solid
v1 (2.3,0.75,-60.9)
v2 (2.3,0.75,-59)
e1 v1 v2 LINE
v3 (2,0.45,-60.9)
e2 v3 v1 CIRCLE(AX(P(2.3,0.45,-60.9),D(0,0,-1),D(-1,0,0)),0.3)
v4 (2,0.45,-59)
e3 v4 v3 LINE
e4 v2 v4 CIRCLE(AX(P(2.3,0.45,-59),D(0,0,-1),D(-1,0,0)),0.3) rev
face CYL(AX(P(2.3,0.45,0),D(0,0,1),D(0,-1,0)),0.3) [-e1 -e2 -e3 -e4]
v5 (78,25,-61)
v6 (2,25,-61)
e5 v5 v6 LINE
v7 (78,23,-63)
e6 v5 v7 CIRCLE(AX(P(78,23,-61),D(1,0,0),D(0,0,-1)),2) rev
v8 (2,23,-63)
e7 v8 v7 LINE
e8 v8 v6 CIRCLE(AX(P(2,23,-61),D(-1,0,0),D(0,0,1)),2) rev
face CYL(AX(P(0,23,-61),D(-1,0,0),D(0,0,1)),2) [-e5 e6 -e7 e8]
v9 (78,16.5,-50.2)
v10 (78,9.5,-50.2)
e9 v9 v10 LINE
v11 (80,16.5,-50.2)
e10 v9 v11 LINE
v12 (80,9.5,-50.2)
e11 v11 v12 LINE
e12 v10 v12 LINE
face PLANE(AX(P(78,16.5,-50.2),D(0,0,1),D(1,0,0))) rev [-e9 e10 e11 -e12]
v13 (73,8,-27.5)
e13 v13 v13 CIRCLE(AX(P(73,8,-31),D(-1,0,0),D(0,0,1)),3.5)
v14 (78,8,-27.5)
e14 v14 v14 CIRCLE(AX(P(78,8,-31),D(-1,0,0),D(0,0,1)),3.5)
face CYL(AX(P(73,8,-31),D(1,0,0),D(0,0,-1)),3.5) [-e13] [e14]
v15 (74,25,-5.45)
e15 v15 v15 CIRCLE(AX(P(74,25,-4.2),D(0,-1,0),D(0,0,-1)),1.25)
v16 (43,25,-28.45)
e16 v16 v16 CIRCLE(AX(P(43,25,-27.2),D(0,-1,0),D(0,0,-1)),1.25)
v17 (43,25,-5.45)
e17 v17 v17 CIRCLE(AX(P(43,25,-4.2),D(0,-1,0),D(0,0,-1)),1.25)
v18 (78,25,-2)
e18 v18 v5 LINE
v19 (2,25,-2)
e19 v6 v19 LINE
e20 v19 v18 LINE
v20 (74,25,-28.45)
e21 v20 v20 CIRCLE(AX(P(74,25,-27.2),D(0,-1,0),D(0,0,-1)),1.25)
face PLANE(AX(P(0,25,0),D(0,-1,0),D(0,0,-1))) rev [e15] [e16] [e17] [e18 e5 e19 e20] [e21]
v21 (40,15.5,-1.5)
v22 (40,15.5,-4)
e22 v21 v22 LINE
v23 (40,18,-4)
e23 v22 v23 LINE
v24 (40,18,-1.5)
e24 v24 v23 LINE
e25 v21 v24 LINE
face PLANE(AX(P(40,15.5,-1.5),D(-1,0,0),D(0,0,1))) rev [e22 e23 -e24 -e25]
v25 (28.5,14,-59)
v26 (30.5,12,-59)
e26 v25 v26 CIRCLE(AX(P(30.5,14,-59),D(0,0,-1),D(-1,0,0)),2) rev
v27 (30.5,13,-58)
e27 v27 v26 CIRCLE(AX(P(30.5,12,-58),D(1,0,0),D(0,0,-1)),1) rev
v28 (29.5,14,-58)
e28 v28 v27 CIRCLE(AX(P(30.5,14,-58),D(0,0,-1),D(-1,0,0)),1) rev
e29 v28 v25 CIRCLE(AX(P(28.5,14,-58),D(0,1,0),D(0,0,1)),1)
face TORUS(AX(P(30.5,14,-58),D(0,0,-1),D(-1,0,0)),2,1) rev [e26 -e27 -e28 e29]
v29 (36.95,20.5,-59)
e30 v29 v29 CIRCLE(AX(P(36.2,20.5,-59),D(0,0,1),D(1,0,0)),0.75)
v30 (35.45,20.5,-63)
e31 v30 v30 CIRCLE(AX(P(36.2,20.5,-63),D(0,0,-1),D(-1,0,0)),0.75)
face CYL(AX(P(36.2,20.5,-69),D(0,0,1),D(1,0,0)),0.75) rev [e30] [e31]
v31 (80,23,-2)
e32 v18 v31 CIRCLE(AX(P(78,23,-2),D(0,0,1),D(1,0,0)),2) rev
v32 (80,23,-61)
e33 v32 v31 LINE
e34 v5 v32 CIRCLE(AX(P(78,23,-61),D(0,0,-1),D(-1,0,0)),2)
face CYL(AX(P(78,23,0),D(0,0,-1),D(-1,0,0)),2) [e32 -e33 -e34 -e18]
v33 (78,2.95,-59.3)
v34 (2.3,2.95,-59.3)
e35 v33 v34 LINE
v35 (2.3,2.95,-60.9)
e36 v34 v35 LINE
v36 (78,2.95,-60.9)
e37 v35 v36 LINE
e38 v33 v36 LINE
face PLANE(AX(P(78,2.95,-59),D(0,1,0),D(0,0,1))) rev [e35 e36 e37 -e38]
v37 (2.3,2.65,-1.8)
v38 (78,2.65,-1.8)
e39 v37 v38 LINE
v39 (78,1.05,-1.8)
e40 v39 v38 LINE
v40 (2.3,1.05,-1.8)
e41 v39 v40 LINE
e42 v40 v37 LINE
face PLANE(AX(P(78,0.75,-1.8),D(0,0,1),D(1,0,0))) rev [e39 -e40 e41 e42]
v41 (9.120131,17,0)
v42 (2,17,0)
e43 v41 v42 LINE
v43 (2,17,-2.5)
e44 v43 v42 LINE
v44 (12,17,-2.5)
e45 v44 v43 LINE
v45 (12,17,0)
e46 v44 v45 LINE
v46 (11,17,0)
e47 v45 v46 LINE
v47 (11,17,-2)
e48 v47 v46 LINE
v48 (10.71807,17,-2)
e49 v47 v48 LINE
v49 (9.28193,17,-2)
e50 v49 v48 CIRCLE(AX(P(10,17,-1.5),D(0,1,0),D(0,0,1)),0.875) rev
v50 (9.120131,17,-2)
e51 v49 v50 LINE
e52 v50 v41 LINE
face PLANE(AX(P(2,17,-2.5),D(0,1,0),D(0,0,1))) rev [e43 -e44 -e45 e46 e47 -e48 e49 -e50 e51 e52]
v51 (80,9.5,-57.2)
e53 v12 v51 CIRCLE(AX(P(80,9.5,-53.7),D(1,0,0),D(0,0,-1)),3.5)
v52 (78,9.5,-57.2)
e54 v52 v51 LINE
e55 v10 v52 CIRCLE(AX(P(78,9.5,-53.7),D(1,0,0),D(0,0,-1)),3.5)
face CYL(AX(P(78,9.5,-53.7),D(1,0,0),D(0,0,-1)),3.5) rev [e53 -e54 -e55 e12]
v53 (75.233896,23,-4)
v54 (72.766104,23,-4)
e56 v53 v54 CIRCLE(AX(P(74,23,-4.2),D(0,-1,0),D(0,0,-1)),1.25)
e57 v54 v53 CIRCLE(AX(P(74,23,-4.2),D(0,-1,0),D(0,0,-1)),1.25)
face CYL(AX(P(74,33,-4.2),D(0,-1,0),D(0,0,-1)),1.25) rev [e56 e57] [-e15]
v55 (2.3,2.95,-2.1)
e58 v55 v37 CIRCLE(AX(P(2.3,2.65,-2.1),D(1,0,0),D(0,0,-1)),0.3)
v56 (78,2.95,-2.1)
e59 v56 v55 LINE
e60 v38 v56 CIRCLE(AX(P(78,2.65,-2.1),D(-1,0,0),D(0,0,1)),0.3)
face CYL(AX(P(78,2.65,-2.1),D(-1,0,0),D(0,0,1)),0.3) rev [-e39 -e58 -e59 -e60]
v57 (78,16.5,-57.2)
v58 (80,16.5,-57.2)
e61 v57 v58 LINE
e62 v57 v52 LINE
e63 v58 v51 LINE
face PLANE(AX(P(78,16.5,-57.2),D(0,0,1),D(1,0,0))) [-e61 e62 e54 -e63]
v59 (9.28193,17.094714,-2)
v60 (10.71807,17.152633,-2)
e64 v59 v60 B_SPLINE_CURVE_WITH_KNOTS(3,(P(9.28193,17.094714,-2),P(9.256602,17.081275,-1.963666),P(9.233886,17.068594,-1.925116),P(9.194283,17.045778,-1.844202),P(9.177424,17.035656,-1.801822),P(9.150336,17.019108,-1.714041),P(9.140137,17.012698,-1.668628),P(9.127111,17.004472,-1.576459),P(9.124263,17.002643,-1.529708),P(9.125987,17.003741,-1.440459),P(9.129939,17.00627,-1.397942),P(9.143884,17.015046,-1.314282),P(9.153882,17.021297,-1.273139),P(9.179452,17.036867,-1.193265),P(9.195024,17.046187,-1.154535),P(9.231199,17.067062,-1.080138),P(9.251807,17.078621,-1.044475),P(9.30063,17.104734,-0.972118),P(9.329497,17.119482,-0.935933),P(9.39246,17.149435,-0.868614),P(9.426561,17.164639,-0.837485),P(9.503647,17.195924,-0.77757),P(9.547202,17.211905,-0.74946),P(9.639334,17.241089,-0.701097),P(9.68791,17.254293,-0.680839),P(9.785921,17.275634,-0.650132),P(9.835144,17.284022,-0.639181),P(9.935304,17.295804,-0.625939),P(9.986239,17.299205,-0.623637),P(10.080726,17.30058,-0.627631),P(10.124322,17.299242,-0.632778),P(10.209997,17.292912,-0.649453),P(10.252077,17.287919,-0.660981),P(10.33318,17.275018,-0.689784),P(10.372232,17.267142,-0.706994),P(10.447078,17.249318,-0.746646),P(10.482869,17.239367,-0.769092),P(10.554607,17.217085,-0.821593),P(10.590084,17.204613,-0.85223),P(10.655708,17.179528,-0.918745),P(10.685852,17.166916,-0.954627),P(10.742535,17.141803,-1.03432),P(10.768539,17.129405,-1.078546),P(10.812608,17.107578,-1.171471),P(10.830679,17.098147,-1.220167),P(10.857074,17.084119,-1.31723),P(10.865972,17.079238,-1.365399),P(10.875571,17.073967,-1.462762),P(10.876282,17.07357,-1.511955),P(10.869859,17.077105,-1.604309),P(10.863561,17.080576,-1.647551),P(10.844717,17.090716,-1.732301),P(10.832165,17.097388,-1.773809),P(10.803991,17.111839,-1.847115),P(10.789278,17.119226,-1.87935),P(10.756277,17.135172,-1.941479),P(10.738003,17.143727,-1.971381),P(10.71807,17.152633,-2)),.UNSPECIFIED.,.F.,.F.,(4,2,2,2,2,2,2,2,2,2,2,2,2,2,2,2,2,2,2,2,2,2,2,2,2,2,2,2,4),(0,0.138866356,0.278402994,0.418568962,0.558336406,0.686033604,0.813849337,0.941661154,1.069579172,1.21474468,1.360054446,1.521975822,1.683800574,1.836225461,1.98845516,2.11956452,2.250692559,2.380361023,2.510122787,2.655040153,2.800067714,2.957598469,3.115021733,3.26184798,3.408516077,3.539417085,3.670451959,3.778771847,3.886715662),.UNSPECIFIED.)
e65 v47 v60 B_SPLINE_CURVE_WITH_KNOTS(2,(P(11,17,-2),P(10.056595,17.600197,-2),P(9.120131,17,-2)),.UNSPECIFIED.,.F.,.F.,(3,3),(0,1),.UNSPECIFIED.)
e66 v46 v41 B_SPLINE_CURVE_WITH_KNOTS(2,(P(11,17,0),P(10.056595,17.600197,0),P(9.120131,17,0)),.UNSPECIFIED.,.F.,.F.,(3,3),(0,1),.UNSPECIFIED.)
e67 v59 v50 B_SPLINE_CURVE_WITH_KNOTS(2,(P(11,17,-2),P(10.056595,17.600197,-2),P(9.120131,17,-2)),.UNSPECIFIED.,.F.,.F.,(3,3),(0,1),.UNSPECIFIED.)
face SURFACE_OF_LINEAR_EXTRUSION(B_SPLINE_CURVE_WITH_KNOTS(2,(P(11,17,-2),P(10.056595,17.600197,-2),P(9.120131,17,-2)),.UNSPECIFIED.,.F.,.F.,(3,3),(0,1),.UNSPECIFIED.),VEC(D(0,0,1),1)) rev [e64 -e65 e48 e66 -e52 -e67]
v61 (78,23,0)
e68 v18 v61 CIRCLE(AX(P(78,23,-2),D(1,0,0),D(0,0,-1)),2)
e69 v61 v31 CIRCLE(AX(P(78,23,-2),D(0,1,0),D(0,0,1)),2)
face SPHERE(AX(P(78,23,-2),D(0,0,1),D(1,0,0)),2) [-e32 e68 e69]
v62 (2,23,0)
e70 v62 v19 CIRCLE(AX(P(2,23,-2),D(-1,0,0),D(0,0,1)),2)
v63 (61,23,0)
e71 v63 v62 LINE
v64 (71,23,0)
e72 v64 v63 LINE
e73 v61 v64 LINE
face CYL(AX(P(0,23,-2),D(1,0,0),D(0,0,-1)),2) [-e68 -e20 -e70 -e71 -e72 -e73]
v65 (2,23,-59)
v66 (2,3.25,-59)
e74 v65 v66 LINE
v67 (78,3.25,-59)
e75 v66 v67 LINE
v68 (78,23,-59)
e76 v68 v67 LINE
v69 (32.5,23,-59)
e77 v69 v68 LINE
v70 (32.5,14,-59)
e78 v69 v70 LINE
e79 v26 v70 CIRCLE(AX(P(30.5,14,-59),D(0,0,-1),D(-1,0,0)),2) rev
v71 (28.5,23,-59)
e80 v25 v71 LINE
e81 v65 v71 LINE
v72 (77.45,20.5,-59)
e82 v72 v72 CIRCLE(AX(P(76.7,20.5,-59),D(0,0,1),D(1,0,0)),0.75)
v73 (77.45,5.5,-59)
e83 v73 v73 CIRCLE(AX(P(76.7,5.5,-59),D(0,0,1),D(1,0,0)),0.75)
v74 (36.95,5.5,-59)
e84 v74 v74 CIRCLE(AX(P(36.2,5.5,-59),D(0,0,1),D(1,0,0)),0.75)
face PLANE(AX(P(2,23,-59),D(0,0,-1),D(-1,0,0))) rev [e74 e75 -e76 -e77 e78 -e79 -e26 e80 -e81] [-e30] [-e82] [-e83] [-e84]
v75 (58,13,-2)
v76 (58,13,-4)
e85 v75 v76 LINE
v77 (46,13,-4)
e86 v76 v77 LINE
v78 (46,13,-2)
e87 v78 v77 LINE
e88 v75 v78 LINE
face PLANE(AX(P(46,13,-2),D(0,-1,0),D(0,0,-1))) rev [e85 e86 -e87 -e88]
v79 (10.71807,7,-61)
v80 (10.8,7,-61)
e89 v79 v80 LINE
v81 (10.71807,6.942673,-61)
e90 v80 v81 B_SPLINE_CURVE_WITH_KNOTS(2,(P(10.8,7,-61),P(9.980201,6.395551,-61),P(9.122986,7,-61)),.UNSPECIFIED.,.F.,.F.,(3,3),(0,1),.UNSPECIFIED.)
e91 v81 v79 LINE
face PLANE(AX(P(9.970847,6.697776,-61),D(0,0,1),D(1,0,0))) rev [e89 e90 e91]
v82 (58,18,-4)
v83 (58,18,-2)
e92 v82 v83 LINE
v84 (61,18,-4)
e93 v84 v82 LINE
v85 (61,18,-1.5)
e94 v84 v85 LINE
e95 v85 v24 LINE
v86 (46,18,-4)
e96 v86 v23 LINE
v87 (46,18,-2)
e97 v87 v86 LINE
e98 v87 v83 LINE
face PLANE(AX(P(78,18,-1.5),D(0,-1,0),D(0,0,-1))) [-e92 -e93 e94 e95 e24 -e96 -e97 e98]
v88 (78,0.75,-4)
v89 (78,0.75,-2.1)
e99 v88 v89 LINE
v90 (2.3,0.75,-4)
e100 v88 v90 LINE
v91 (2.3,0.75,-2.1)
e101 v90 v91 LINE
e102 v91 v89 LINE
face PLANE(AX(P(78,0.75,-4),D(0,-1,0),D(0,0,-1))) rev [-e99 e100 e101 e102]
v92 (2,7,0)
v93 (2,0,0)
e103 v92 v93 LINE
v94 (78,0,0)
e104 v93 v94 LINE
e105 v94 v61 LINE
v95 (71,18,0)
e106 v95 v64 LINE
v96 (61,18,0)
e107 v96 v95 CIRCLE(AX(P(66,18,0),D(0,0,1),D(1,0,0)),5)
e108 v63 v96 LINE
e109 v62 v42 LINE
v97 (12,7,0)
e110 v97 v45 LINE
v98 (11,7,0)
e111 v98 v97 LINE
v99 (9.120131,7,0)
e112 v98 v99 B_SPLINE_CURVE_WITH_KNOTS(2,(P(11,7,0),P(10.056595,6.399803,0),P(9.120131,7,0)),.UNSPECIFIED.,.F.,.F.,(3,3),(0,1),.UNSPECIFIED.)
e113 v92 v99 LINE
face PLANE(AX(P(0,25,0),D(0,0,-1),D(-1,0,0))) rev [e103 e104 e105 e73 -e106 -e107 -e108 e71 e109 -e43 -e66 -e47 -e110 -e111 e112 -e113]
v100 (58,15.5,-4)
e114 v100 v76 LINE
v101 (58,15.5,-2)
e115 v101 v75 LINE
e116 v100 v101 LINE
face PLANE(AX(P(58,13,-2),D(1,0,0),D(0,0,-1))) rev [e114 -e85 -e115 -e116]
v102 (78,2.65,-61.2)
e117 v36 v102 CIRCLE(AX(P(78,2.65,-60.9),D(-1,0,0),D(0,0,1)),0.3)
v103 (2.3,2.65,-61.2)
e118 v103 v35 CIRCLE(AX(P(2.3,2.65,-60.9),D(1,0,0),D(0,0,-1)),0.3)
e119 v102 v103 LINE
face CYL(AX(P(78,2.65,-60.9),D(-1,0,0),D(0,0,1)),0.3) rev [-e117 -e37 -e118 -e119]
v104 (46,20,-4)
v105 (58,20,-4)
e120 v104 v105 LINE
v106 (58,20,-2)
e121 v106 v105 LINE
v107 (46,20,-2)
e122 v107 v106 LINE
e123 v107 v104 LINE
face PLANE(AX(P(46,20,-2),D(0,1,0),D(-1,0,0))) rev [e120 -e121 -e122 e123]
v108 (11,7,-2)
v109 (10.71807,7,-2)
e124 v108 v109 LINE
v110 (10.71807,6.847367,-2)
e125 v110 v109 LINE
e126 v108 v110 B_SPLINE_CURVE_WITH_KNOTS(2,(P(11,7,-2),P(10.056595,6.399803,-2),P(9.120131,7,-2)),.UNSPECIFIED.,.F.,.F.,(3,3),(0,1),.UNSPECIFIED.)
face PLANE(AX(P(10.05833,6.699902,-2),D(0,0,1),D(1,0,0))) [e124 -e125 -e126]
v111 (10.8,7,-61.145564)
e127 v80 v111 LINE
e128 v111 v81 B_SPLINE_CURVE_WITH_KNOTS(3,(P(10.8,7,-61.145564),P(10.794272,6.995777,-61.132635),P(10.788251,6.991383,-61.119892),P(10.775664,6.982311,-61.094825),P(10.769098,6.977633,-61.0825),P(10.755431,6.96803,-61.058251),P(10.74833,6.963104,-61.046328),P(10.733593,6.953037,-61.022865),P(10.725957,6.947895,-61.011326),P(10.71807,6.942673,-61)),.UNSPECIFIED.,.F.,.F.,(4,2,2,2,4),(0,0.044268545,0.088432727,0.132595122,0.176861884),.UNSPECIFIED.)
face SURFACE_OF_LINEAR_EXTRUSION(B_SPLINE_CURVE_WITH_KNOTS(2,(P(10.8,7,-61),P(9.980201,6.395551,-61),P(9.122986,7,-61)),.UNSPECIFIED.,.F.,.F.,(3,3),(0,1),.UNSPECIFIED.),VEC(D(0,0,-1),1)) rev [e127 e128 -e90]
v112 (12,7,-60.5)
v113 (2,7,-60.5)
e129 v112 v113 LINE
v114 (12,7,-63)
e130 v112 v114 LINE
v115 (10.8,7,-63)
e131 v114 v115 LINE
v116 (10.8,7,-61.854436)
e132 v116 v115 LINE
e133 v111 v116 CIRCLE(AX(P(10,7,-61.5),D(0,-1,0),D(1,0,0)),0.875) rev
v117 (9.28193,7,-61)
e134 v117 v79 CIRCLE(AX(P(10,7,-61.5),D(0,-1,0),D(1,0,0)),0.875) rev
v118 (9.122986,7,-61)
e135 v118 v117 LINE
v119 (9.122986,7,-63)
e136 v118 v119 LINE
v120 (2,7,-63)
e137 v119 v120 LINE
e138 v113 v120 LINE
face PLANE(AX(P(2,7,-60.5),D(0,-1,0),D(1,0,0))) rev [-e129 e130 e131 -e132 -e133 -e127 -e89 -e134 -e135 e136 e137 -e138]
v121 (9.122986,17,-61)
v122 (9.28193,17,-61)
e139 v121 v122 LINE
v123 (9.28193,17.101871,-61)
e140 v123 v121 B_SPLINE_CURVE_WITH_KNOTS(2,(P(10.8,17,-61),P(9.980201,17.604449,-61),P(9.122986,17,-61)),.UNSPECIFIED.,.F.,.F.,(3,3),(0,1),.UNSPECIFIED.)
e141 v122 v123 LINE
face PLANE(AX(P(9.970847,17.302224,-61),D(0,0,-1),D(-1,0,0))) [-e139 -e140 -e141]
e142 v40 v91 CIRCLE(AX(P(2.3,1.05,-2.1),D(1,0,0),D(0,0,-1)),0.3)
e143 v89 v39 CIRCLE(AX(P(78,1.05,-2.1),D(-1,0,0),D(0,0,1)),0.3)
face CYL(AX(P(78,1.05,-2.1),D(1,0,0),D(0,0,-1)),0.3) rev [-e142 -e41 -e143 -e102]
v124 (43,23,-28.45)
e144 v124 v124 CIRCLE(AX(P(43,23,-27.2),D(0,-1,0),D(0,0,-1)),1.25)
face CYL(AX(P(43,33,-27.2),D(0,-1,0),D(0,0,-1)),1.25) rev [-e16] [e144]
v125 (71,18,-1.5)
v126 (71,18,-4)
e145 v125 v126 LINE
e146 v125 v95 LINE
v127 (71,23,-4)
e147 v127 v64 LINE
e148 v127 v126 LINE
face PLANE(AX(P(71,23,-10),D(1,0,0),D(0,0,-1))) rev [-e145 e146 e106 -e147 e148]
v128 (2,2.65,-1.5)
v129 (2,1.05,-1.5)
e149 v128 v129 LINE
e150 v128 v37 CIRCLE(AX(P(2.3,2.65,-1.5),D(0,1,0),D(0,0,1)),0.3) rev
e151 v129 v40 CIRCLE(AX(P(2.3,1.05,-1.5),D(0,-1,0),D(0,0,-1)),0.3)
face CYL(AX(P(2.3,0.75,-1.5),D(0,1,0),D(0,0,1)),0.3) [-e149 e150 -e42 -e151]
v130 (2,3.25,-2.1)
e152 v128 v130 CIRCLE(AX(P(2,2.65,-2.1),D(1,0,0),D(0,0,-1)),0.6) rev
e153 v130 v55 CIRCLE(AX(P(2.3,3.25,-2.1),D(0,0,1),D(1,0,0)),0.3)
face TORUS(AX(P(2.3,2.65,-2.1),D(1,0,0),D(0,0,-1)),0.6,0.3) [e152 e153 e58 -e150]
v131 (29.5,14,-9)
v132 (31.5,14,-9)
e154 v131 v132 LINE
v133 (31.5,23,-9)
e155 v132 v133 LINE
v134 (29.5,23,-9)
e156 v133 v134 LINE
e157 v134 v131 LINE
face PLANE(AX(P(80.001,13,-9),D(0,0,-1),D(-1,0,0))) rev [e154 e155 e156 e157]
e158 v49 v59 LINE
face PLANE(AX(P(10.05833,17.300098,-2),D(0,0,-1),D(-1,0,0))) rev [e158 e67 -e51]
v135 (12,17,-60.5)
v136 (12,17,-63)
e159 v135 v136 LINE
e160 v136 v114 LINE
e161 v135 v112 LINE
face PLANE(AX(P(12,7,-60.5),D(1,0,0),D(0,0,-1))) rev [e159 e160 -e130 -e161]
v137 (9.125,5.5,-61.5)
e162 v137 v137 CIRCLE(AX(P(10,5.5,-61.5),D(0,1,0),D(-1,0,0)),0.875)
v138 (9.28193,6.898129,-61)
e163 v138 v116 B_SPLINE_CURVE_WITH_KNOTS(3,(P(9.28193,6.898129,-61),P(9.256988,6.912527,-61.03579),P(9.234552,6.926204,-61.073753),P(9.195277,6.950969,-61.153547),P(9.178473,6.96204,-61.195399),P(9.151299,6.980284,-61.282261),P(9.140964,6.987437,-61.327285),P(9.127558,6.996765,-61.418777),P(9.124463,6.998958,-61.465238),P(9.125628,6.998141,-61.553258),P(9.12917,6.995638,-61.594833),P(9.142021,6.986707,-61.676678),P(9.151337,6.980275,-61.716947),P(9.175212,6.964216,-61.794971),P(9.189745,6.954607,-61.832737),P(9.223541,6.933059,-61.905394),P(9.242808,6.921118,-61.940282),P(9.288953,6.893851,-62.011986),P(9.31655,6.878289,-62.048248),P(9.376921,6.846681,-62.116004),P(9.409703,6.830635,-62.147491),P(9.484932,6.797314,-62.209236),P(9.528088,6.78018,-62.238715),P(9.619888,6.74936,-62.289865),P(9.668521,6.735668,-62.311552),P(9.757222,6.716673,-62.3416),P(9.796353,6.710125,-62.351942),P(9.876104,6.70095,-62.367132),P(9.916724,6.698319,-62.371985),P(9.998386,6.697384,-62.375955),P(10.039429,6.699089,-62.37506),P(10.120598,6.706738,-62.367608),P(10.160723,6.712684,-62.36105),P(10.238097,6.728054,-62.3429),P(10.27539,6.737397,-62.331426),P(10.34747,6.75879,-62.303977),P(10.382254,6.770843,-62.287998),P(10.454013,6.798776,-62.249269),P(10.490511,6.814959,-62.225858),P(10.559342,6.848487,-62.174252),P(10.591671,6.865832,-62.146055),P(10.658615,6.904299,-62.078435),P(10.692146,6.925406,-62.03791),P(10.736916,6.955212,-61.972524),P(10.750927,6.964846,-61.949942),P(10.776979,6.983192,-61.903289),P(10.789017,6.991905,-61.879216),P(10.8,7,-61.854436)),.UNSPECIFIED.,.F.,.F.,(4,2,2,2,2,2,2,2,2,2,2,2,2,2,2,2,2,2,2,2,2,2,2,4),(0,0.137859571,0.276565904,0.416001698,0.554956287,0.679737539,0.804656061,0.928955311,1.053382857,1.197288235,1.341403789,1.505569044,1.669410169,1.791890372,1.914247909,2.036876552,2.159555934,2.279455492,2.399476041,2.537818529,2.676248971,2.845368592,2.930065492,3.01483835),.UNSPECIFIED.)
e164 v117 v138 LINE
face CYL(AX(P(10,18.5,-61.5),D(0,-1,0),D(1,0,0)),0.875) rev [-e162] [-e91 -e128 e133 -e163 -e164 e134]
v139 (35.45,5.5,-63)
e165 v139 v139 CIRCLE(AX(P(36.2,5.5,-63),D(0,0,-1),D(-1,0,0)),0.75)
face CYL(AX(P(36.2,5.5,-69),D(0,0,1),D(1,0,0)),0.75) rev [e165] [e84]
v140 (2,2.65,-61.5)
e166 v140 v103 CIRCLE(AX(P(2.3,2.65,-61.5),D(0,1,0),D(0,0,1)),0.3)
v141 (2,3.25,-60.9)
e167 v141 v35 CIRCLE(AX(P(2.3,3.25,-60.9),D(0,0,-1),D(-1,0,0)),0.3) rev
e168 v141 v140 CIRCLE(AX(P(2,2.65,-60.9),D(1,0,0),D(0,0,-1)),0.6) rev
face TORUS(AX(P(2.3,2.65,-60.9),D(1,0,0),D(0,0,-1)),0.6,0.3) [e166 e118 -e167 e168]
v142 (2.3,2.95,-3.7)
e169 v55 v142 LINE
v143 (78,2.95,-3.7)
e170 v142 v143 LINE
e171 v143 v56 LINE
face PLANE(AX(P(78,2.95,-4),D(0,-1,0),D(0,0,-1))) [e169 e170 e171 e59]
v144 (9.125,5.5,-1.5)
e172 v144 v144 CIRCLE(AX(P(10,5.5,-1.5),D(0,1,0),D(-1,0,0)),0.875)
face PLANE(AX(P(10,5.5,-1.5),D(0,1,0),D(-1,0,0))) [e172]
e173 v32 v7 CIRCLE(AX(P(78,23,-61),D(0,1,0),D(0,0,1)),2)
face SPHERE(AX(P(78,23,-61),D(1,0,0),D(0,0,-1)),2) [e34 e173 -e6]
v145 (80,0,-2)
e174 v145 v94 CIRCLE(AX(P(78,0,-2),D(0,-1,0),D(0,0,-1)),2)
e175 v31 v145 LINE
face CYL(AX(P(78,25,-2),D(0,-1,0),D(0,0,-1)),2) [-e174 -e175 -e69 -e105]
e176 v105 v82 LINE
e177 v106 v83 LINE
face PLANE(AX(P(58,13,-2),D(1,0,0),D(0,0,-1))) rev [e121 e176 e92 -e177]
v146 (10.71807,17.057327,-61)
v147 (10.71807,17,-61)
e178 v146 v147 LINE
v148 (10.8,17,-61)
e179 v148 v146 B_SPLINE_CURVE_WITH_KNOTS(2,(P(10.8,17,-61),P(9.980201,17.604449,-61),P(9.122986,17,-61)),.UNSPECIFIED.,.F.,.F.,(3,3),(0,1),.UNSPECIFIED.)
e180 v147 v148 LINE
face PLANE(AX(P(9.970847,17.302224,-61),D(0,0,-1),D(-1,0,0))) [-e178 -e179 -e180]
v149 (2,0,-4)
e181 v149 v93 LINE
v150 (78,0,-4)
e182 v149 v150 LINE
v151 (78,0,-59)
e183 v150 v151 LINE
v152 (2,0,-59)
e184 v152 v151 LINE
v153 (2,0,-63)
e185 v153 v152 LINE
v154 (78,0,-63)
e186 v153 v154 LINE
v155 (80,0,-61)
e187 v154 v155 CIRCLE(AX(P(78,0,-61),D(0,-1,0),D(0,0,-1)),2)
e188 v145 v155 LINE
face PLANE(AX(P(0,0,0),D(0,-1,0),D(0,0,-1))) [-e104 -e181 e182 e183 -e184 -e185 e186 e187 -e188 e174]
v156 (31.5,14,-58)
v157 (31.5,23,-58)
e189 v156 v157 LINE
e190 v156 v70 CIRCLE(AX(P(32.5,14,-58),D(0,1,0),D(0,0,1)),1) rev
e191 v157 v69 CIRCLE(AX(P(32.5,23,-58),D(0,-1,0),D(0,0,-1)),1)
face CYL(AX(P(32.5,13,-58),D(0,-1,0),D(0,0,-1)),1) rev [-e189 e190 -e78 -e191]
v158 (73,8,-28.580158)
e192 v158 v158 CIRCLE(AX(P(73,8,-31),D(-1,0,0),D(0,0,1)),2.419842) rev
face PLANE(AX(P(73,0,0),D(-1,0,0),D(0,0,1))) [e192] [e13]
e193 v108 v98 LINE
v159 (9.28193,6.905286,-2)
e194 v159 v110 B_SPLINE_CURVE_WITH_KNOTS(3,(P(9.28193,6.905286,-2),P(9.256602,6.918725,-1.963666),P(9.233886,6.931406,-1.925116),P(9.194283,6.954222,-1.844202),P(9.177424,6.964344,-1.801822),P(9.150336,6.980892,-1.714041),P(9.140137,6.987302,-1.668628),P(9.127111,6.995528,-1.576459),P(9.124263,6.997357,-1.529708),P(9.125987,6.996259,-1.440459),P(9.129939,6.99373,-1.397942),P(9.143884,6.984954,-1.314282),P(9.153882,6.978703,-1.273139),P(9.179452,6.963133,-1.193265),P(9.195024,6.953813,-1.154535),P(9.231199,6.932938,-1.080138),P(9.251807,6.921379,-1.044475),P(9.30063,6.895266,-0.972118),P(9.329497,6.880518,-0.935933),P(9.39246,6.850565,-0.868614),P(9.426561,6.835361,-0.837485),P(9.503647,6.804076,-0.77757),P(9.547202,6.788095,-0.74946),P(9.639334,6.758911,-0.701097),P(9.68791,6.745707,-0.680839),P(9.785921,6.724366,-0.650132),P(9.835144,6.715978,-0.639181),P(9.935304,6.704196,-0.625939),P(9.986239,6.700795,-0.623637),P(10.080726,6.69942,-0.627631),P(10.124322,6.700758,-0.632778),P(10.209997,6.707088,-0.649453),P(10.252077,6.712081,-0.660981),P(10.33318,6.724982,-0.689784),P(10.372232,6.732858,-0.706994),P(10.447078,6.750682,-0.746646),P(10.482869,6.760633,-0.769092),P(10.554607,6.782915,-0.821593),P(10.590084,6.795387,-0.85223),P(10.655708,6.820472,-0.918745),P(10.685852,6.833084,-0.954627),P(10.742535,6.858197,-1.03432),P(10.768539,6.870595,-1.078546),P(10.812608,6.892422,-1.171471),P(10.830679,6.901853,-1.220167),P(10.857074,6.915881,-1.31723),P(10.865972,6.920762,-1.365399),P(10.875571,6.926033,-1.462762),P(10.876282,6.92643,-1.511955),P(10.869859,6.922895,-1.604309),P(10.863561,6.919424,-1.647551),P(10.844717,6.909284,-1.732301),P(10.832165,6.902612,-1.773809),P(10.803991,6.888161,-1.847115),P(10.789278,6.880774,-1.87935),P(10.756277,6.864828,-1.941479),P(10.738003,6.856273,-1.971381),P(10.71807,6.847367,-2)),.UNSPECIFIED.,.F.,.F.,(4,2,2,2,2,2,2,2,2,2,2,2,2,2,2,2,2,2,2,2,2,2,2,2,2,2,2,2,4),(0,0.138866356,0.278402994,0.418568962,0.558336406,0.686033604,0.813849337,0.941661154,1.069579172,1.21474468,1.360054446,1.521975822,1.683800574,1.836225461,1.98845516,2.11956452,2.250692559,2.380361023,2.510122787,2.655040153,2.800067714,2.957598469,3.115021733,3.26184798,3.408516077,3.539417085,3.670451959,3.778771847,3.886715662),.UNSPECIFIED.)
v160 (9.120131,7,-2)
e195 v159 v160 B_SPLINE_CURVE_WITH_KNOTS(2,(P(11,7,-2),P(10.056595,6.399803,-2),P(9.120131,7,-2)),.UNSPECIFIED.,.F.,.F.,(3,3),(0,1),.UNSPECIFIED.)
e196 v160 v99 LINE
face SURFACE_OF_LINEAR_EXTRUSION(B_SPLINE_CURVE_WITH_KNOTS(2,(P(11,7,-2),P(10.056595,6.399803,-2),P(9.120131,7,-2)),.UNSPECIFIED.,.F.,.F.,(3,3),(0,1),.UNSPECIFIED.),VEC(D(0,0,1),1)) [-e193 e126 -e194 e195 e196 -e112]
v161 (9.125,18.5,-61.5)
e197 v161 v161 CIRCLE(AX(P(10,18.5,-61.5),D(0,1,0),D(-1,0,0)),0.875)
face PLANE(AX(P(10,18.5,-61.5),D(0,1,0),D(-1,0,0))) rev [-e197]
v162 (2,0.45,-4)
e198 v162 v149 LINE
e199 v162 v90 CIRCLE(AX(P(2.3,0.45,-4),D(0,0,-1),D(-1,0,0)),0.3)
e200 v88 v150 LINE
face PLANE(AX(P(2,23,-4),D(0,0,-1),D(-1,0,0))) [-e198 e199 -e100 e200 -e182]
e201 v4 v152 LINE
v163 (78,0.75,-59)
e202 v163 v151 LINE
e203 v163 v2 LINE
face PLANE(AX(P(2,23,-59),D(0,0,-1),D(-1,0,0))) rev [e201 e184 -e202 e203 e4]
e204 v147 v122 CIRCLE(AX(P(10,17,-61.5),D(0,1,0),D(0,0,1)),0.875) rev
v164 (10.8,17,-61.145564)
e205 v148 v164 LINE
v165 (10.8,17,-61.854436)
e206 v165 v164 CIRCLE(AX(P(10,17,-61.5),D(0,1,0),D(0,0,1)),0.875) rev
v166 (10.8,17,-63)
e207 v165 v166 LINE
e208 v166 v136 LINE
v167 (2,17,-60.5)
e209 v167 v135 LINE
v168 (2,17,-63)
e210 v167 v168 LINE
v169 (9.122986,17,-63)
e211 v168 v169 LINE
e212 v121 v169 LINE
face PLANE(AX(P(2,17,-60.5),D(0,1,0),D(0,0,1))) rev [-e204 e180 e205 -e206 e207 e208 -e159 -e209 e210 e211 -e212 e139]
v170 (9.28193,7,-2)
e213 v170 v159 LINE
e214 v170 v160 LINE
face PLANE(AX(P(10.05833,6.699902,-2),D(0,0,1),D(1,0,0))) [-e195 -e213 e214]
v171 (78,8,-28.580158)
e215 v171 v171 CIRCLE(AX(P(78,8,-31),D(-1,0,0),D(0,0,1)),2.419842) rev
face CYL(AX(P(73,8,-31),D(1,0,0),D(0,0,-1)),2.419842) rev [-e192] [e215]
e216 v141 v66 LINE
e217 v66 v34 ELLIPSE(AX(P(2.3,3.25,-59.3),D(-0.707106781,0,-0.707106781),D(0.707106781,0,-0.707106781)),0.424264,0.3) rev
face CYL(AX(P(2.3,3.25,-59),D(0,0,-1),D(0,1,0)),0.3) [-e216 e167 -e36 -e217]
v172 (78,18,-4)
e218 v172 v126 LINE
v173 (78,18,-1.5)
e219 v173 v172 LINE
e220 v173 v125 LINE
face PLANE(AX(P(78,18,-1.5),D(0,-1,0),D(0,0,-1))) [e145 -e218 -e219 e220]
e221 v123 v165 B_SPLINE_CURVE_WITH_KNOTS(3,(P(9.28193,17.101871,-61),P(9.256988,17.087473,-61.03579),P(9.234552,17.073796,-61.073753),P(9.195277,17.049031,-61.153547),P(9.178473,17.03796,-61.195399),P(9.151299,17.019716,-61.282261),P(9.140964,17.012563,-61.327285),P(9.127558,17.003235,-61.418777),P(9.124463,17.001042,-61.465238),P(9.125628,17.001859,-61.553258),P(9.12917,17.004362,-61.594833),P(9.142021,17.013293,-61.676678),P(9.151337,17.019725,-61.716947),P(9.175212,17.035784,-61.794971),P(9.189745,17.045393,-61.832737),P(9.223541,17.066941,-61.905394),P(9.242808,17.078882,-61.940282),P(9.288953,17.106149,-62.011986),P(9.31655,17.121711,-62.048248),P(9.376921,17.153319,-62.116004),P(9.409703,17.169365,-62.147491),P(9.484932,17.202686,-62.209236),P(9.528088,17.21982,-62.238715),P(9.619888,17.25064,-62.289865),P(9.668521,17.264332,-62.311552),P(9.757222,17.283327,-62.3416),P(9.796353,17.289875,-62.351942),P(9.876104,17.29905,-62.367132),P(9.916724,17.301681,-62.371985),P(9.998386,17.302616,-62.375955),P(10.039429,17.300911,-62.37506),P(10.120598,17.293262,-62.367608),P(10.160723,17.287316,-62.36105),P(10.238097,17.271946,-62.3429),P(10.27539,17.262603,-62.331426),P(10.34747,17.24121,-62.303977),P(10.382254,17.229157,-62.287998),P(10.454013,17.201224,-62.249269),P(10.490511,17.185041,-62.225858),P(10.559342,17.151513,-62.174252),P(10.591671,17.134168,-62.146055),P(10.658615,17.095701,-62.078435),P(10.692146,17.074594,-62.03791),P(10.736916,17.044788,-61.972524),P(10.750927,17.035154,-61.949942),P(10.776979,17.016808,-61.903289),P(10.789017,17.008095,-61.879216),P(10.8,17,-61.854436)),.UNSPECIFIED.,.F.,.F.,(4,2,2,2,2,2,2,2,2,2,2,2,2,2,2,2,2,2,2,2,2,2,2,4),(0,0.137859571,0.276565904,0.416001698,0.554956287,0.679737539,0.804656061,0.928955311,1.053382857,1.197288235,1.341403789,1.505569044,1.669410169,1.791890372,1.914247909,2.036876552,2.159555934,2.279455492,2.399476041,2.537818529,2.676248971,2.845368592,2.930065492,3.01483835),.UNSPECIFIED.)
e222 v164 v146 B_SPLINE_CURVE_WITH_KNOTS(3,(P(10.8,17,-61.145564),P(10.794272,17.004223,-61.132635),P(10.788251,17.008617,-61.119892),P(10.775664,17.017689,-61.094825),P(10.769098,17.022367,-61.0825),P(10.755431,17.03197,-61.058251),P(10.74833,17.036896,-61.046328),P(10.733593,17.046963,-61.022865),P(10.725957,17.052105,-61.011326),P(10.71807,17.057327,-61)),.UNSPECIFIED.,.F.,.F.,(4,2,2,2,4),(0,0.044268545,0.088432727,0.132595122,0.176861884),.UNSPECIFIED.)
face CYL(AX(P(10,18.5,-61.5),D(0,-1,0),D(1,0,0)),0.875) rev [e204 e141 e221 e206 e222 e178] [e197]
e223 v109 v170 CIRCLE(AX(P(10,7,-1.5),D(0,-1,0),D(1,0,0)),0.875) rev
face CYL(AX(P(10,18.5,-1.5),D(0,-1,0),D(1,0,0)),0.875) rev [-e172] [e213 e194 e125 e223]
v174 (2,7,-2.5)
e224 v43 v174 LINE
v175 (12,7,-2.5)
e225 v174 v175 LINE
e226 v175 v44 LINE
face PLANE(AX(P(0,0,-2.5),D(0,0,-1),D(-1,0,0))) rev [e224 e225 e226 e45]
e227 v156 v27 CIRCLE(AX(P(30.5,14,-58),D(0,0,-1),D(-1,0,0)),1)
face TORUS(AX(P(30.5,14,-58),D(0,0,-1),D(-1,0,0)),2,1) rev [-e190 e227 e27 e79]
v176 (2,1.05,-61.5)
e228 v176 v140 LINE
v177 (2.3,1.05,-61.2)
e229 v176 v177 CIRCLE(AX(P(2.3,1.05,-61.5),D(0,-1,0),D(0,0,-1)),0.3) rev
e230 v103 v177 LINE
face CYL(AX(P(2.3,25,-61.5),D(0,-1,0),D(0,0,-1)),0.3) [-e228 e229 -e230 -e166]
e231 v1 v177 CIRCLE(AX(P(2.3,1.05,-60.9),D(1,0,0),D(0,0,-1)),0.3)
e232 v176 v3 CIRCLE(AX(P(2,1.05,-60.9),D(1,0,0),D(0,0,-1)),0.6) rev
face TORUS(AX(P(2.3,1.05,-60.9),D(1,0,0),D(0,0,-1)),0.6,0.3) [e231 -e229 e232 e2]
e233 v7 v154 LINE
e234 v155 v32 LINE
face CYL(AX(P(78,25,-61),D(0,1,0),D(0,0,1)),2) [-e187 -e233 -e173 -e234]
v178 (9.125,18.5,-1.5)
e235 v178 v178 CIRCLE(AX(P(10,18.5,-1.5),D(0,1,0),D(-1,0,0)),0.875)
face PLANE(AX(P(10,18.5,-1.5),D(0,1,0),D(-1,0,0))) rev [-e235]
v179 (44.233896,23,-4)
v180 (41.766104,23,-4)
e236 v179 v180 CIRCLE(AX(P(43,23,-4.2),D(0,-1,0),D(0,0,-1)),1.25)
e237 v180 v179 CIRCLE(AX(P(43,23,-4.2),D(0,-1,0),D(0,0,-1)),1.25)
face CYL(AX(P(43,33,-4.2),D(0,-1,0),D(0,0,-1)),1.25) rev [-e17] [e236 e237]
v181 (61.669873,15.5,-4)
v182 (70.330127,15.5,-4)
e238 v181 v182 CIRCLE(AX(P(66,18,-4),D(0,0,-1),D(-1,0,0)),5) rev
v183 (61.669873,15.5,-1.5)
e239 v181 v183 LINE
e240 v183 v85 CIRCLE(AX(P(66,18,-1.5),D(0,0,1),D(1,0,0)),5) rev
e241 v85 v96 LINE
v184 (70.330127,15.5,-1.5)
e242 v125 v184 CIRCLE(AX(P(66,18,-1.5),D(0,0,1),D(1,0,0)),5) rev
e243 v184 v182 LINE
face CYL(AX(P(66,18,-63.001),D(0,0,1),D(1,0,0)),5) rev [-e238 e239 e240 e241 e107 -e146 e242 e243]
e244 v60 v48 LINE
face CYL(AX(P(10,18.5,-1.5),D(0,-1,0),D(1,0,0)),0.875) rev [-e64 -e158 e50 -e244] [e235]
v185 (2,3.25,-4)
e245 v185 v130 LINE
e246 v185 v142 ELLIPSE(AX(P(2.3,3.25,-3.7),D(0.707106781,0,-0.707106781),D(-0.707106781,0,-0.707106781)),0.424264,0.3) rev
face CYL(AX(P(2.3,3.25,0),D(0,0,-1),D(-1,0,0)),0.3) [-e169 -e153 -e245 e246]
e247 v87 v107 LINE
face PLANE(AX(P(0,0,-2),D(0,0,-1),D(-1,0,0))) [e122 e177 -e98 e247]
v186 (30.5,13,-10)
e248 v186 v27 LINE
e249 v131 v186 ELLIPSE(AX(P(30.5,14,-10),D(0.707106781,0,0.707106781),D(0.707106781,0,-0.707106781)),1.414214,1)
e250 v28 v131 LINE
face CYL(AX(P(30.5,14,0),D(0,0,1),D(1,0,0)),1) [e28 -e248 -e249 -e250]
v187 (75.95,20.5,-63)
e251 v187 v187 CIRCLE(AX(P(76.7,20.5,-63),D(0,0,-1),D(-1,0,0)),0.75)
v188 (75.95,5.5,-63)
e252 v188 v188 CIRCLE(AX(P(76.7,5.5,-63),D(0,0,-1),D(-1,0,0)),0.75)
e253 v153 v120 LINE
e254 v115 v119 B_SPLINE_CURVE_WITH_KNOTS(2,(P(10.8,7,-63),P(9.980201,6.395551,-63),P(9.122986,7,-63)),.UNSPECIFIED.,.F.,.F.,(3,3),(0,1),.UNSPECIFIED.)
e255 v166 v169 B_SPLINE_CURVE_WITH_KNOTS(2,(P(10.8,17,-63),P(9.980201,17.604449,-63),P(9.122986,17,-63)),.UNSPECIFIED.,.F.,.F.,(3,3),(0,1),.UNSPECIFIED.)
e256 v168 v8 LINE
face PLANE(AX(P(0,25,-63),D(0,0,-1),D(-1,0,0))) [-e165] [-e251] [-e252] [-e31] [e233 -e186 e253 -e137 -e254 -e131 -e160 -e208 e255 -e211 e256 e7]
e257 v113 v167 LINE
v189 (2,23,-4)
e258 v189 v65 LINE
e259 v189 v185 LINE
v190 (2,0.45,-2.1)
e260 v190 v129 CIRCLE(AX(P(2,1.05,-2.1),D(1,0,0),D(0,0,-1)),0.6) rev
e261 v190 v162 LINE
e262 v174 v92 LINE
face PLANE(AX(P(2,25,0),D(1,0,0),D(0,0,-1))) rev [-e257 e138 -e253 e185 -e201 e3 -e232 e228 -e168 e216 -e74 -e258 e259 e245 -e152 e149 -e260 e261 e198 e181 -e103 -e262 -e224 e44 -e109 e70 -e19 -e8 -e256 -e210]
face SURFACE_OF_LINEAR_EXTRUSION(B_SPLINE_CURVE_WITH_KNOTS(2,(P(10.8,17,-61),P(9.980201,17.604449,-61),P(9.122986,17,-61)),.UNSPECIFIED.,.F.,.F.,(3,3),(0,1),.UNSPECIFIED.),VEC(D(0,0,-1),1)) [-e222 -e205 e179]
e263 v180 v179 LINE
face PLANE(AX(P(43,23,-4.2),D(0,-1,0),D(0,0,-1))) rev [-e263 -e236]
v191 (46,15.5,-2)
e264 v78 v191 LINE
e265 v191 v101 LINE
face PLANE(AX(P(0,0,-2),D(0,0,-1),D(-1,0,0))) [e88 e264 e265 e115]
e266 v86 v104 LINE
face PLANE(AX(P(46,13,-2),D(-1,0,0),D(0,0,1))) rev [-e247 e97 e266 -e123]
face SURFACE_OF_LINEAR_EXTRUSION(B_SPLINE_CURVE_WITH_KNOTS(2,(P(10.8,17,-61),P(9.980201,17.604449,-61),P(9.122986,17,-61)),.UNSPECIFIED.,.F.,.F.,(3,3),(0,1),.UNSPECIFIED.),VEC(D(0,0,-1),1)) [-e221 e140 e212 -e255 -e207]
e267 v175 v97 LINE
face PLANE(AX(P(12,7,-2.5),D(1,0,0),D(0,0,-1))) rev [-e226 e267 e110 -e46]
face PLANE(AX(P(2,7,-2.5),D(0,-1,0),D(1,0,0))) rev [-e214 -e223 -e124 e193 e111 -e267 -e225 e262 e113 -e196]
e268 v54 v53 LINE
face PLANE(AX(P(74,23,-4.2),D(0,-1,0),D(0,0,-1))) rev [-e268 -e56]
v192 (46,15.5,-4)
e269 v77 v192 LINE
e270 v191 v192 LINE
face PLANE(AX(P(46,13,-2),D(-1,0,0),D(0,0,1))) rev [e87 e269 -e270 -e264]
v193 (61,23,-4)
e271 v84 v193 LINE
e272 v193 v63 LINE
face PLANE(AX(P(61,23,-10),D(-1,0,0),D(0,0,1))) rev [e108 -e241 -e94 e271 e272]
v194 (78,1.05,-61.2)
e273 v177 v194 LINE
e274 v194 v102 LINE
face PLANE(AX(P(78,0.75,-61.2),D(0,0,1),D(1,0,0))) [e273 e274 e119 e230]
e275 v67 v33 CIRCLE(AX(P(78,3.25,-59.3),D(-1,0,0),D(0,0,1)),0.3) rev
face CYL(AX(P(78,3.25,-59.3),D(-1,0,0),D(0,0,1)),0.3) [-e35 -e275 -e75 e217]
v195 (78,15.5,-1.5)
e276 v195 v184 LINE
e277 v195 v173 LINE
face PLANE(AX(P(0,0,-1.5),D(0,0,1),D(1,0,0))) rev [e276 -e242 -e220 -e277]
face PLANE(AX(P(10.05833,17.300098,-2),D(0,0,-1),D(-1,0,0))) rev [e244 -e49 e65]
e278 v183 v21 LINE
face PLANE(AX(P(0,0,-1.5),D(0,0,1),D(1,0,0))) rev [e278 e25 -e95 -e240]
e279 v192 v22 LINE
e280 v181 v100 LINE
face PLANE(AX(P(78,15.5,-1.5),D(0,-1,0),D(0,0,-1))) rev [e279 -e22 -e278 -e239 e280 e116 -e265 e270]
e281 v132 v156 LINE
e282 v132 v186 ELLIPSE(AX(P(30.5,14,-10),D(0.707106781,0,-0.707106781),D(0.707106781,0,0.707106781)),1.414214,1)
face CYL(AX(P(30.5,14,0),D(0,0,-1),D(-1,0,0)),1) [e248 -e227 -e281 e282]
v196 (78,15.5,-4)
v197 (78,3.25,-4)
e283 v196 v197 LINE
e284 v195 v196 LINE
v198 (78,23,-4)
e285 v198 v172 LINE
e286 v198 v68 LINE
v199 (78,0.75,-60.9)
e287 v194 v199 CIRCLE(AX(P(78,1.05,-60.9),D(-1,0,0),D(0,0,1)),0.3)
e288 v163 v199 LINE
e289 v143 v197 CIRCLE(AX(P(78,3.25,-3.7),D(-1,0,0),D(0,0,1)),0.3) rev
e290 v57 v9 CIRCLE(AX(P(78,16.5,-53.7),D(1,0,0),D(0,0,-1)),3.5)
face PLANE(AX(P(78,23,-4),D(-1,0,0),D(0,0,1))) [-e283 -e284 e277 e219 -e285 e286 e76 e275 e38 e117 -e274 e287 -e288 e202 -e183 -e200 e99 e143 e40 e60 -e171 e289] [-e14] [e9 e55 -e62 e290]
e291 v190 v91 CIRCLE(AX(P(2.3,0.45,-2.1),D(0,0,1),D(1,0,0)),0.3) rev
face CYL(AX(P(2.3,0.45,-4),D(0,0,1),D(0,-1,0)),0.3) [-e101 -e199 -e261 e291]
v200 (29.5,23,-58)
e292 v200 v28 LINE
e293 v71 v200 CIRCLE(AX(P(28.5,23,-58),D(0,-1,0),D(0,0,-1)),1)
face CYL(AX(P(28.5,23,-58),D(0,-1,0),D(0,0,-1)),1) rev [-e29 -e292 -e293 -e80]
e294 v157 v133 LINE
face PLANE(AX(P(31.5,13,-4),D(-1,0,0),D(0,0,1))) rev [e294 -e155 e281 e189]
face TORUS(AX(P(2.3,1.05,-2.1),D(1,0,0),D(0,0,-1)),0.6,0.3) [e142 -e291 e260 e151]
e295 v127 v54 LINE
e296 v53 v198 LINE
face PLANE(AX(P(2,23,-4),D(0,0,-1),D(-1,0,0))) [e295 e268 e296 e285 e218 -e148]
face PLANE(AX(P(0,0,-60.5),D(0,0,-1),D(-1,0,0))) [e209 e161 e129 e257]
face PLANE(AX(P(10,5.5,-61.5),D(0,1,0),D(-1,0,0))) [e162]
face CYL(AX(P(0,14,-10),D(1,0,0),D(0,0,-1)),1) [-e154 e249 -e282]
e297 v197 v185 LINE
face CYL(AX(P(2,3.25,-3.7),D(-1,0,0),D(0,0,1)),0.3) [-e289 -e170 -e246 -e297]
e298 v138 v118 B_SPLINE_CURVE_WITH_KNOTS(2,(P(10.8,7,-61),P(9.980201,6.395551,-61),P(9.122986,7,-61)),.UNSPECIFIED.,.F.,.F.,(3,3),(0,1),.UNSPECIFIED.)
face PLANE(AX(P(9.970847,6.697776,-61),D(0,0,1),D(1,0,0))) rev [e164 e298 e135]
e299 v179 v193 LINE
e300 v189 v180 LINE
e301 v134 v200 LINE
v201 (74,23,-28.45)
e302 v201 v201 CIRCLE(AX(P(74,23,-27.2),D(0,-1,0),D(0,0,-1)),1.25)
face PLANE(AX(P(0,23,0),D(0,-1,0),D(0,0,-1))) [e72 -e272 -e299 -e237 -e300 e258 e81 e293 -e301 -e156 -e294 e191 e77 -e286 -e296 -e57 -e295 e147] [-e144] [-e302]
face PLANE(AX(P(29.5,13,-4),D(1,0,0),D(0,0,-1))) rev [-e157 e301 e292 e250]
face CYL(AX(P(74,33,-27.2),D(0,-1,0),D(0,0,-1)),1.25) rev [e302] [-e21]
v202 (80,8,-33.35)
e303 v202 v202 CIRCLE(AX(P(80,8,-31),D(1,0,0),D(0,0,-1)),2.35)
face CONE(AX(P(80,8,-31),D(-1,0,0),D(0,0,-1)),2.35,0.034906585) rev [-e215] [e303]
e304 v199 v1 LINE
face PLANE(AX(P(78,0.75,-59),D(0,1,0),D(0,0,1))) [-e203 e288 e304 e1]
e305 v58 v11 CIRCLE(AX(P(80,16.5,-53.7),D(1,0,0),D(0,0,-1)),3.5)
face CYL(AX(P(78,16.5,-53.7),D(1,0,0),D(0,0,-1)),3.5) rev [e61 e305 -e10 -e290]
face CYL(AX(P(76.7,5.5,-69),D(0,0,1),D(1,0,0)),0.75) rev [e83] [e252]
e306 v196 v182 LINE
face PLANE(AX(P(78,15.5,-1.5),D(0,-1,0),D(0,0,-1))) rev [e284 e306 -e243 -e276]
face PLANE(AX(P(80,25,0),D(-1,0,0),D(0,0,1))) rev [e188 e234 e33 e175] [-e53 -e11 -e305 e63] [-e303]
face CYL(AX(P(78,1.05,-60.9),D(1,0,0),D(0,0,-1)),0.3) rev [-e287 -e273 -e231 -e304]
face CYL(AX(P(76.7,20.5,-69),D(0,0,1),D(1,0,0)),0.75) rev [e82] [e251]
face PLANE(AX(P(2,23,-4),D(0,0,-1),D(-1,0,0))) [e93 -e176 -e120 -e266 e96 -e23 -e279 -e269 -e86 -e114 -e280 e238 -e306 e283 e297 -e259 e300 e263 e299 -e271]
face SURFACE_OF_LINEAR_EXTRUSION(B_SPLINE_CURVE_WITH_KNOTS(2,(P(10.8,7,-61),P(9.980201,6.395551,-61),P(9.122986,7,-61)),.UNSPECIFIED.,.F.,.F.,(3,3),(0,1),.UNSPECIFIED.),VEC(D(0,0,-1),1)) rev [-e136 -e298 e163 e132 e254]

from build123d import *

# Parameters (mm, degrees)
SKETCH1_W               = 80
SKETCH1_H               = 63
BOSS_EXTRUDE2_DEPTH     = 25
SKETCH1_4_W             = 76
SKETCH1_4_H             = 55
CUT_EXTRUDE1_DEPTH      = 23
SKETCH4_W               = 2
SKETCH4_H               = 55
BOSS_EXTRUDE3_DEPTH     = 10
FILLET1_R               = 2
SKETCH5_W               = 2
SKETCH5_H               = 63
CUT_EXTRUDE3_DEPTH      = 105.852277038
SKETCH6_W               = 2.2
SKETCH6_H               = 2.2
CUT_EXTRUDE4_DEPTH      = 76
SKETCH7_W               = 10
SKETCH7_H               = 10
CUT_EXTRUDE5_DEPTH      = 2.5
CUT_EXTRUDE6_DEPTH      = 11.5
CUT_EXTRUDE6_DEPTH_BACK = 1.5
SKETCH8_R               = 0.875
SKETCH9_W               = 10
SKETCH9_H               = 10
CUT_EXTRUDE7_DEPTH      = 2.5
CUT_EXTRUDE8_DEPTH      = 11.5
CUT_EXTRUDE8_DEPTH_BACK = 1.5
SKETCH10_R              = 0.875
CUT_EXTRUDE9_DEPTH      = 2
CUT_EXTRUDE10_DEPTH     = 2
FILLET2_R               = 0.3
CUT_EXTRUDE13_REACH     = 86.524
SKETCH15_W              = 5
SKETCH15_H              = 10
FILLET3_R               = 1
SKETCH18_R              = 2.35
CUT_EXTRUDE16_DEPTH     = 15
CUT_EXTRUDE16_DRAFT     = 2
SKETCH19_R              = 1.25
CUT_EXTRUDE17_DEPTH     = 10
CUT_EXTRUDE18_REACH     = 106.852
SKETCH17_R              = 5
SKETCH20_R              = 3.5
SKETCH20_R_2            = 2.419841539
BOSS_EXTRUDE4_DEPTH     = 5
SKETCH21_R              = 0.75
CUT_EXTRUDE19_DEPTH     = 10
SKETCH22_W              = 38
SKETCH22_H              = 2.5
CUT_EXTRUDE20_DEPTH     = 2.5
SKETCH23_W              = 10
SKETCH23_H              = 5
CUT_EXTRUDE21_DEPTH     = 10
SKETCH24_W              = 12
SKETCH24_H              = 7
CUT_EXTRUDE22_DEPTH     = 2
CUT_EXTRUDE23_DEPTH     = 2


with BuildPart() as part:
    # Sketch1 → Boss-Extrude2 (new body)
    with BuildSketch(Plane(origin=(0, 0, 0), x_dir=(1, 0, 0), z_dir=(0, 1, 0))):
        with Locations((40, 31.5)):
            Rectangle(SKETCH1_W, SKETCH1_H)
    extrude(amount=BOSS_EXTRUDE2_DEPTH)

    # Sketch1<4> → Cut-Extrude1 (cut)
    with BuildSketch(Plane(origin=(0, 0, 0), x_dir=(1, 0, 0), z_dir=(0, 1, 0))):
        with Locations((40, 31.5)):
            Rectangle(SKETCH1_4_W, SKETCH1_4_H)
    extrude(amount=CUT_EXTRUDE1_DEPTH, mode=Mode.SUBTRACT)

    # Sketch4 → Boss-Extrude3 (add)
    with BuildSketch(Plane.XZ.offset(-23)):
        with Locations((30.5, -31.5)):
            Rectangle(SKETCH4_W, SKETCH4_H)
    extrude(amount=BOSS_EXTRUDE3_DEPTH)

    # Fillet1
    fillet1_edges = [part.edges().sort_by_distance(p)[0] for p in [
        (80, 25, -31.5),
        (40, 25, 0),
        (0, 25, -31.5),
        (0, 12.5, 0),
        (80, 12.5, 0),
        (80, 12.5, -63),
        (0, 12.5, -63),
        (40, 25, -63),
    ]]
    fillet(fillet1_edges, radius=FILLET1_R)

    # Sketch5 → Cut-Extrude3 (cut, through all)
    with BuildSketch(Plane(origin=(0, 0, 0), x_dir=(-1, 0, 0), z_dir=(0, -1, 0))):
        with Locations((-1, 31.5)):
            Rectangle(SKETCH5_W, SKETCH5_H)
    extrude(amount=-CUT_EXTRUDE3_DEPTH, mode=Mode.SUBTRACT)

    # Sketch6 → Cut-Extrude4 (cut)
    with BuildSketch(Plane.ZY.offset(-2)):
        with Locations((-2.9, 1.85)):
            Rectangle(SKETCH6_W, SKETCH6_H)
        with Locations((-60.1, 1.85)):
            Rectangle(SKETCH6_W, SKETCH6_H)
    extrude(amount=-CUT_EXTRUDE4_DEPTH, mode=Mode.SUBTRACT)

    # Sketch7 → Cut-Extrude5 (cut)
    with BuildSketch(Plane(origin=(0, 0, -63), x_dir=(-1, 0, 0), z_dir=(0, 0, -1))):
        with Locations((-7, 12)):
            Rectangle(SKETCH7_W, SKETCH7_H)
    extrude(amount=-CUT_EXTRUDE5_DEPTH, mode=Mode.SUBTRACT)

    # Sketch8 → Cut-Extrude6 (cut, two sides: drawn at the far end of the back side and taken through both)
    with BuildSketch(Plane(origin=(0, 7, 0), x_dir=(1, 0, 0), z_dir=(0, 1, 0)).offset(-CUT_EXTRUDE6_DEPTH_BACK)):
        with Locations(Location((10, 61.5, 0), (0, 0, 270))):
            Circle(SKETCH8_R)
    extrude(amount=CUT_EXTRUDE6_DEPTH + CUT_EXTRUDE6_DEPTH_BACK, mode=Mode.SUBTRACT)

    # Sketch9 → Cut-Extrude7 (cut)
    with BuildSketch(Plane.XY):
        with Locations((7, 12)):
            Rectangle(SKETCH9_W, SKETCH9_H)
    extrude(amount=-CUT_EXTRUDE7_DEPTH, mode=Mode.SUBTRACT)

    # Sketch10 → Cut-Extrude8 (cut, two sides: drawn at the far end of the back side and taken through both)
    with BuildSketch(Plane(origin=(0, 7, 0), x_dir=(1, 0, 0), z_dir=(0, 1, 0)).offset(-CUT_EXTRUDE8_DEPTH_BACK)):
        with Locations((10, 1.5)):
            Circle(SKETCH10_R)
    extrude(amount=CUT_EXTRUDE8_DEPTH + CUT_EXTRUDE8_DEPTH_BACK, mode=Mode.SUBTRACT)

    # Sketch11 → Cut-Extrude9 (cut)
    with BuildSketch(Plane(origin=(0, 0, -63), x_dir=(-1, 0, 0), z_dir=(0, 0, -1))):
        with BuildLine():
            Line((-9.122986176, 7), (-10.8, 7))
            add(Edge.make_bspline(
                [(-10.8, 7), (-9.980201359, 6.395551325), (-9.122986176, 7)],
                knots=[0, 0, 0, 1, 1, 1], degree=2))
        make_face()
        with BuildLine():
            Line((-9.122986176, 17), (-10.8, 17))
            add(Edge.make_bspline(
                [(-10.8, 17), (-9.980201359, 17.604448675), (-9.122986176, 17)],
                knots=[0, 0, 0, 1, 1, 1], degree=2))
        make_face()
    extrude(amount=-CUT_EXTRUDE9_DEPTH, mode=Mode.SUBTRACT)

    # Sketch12 → Cut-Extrude10 (cut)
    with BuildSketch(Plane.XY):
        with BuildLine():
            Line((11, 7), (9.120131213, 7))
            add(Edge.make_bspline(
                [(11, 7), (10.05659536, 6.399803182), (9.120131213, 7)],
                knots=[0, 0, 0, 1, 1, 1], degree=2))
        make_face()
        with BuildLine():
            Line((11, 17), (9.120131213, 17))
            add(Edge.make_bspline(
                [(11, 17), (10.05659536, 17.600196818), (9.120131213, 17)],
                knots=[0, 0, 0, 1, 1, 1], degree=2))
        make_face()
    extrude(amount=-CUT_EXTRUDE10_DEPTH, mode=Mode.SUBTRACT)

    # Fillet2
    fillet2_edges = [part.edges().sort_by_distance(p)[0] for p in [
        (40, 2.95, -59),
        (2, 0.75, -60.1),
        (2, 1.85, -61.2),
        (40, 0.75, -61.2),
        (40, 2.95, -61.2),
        (2, 2.95, -60.1),
        (2, 2.95, -2.9),
        (40, 2.95, -4),
        (40, 2.95, -1.8),
        (40, 0.75, -1.8),
        (2, 0.75, -2.9),
        (2, 1.85, -1.8),
    ]]
    fillet(fillet2_edges, radius=FILLET2_R)

    # Sketch15 → Cut-Extrude13 (cut, up to next)
    with BuildSketch(Plane.ZY.offset(-29.5), mode=Mode.PRIVATE) as cut_extrude13_sk1:
        with Locations((-6.5, 18)):
            Rectangle(SKETCH15_W, SKETCH15_H)
    cut_extrude13_tool1 = extrude(cut_extrude13_sk1.sketch, amount=-CUT_EXTRUDE13_REACH, mode=Mode.PRIVATE) & part.part
    add(cut_extrude13_tool1.solids().sort_by_distance((29.5, 18, -6.5))[0], mode=Mode.SUBTRACT)

    # Fillet3
    fillet3_edges = [part.edges().sort_by_distance(p)[0] for p in [
        (29.5, 13, -34),
        (30.5, 13, -9),
        (29.5, 18, -59),
        (31.5, 18, -59),
        (30.5, 13, -59),
        (31.5, 13, -34),
    ]]
    fillet(fillet3_edges, radius=FILLET3_R - 0.0001)  # a hair under: the kernel refuses the full size


with BuildPart() as cut_extrude16_tool:
    # Sketch18 → Cut-Extrude16 (with draft: the straight prism first)
    with BuildSketch(Plane(origin=(80, 0, 0), x_dir=(0, 0, -1), z_dir=(1, 0, 0))):
        with Locations((31, 8)):
            Circle(SKETCH18_R)
    extrude(amount=-CUT_EXTRUDE16_DEPTH)
    # Cut-Extrude16: the draft: its side faces are tilted about the plane it starts from
    cut_extrude16_sides = [cut_extrude16_tool.faces().sort_by_distance(p)[0] for p in [
        (72.5, 8, -28.65),
    ]]
    draft(cut_extrude16_sides, Plane(origin=(80, 0, 0), x_dir=(0, 0, -1), z_dir=(1, 0, 0)), CUT_EXTRUDE16_DRAFT)


with BuildPart() as part_1:
    add(part.part)

    # Cut-Extrude16: cut by cut_extrude16_tool
    add(cut_extrude16_tool.part, mode=Mode.SUBTRACT)

    # Sketch19 → Cut-Extrude17 (cut)
    with BuildSketch(Plane.XZ.offset(-23)):
        with Locations(Location((74, -4.2, 0), (0, 0, 270))):
            Circle(SKETCH19_R)
        with Locations(Location((74, -27.2, 0), (0, 0, 270))):
            Circle(SKETCH19_R)
        with Locations(Location((43, -27.2, 0), (0, 0, 270))):
            Circle(SKETCH19_R)
        with Locations(Location((43, -4.2, 0), (0, 0, 270))):
            Circle(SKETCH19_R)
    extrude(amount=-CUT_EXTRUDE17_DEPTH, mode=Mode.SUBTRACT)

    # Sketch17 → Cut-Extrude18 (cut, up to next)
    with BuildSketch(Plane.XY, mode=Mode.PRIVATE) as cut_extrude18_sk1:
        with Locations(Location((66, 18, 0), (0, 0, 90))):
            Circle(SKETCH17_R)
    cut_extrude18_tool1 = extrude(cut_extrude18_sk1.sketch, amount=-CUT_EXTRUDE18_REACH, mode=Mode.PRIVATE) & part_1.part
    add(cut_extrude18_tool1.solids().sort_by_distance((66, 18, 0))[0], mode=Mode.SUBTRACT)

    # Sketch20 → Boss-Extrude4 (add)
    with BuildSketch(Plane.ZY.offset(-78)):
        with Locations((-31, 8)):
            Circle(SKETCH20_R)
        with Locations((-31, 8)):
            Circle(SKETCH20_R_2, mode=Mode.SUBTRACT)
    extrude(amount=BOSS_EXTRUDE4_DEPTH)

    # Sketch21 → Cut-Extrude19 (cut)
    with BuildSketch(Plane.XY.offset(-59)):
        with Locations((76.7, 20.5)):
            Circle(SKETCH21_R)
        with Locations((76.7, 5.5)):
            Circle(SKETCH21_R)
        with Locations((36.2, 5.5)):
            Circle(SKETCH21_R)
        with Locations((36.2, 20.5)):
            Circle(SKETCH21_R)
    extrude(amount=-CUT_EXTRUDE19_DEPTH, mode=Mode.SUBTRACT)

    # Sketch22 → Cut-Extrude20 (cut)
    with BuildSketch(Plane(origin=(0, 0, -4), x_dir=(-1, 0, 0), z_dir=(0, 0, -1))):
        with Locations((-59, 16.75)):
            Rectangle(SKETCH22_W, SKETCH22_H)
    extrude(amount=-CUT_EXTRUDE20_DEPTH, mode=Mode.SUBTRACT)

    # Sketch23 → Cut-Extrude21 (cut)
    with BuildSketch(Plane.XY):
        with Locations((66, 20.5)):
            Rectangle(SKETCH23_W, SKETCH23_H)
    extrude(amount=-CUT_EXTRUDE21_DEPTH, mode=Mode.SUBTRACT)

    # Sketch24 → Cut-Extrude22 (cut)
    with BuildSketch(Plane(origin=(0, 0, -4), x_dir=(-1, 0, 0), z_dir=(0, 0, -1))):
        with Locations((-52, 16.5)):
            Rectangle(SKETCH24_W, SKETCH24_H)
    extrude(amount=-CUT_EXTRUDE22_DEPTH, mode=Mode.SUBTRACT)

    # Sketch18<3> → Cut-Extrude23 (cut)
    with BuildSketch(Plane(origin=(80, 0, 0), x_dir=(0, 0, -1), z_dir=(1, 0, 0))):
        with BuildLine():
            Line((57.2, 16.5), (57.2, 9.5))
            ThreePointArc((57.2, 9.5), (53.7, 6), (50.2, 9.5))
            Line((50.2, 9.5), (50.2, 16.5))
            ThreePointArc((50.2, 16.5), (53.7, 20), (57.2, 16.5))
        make_face()
    extrude(amount=-CUT_EXTRUDE23_DEPTH, mode=Mode.SUBTRACT)


solid = part_1.part
